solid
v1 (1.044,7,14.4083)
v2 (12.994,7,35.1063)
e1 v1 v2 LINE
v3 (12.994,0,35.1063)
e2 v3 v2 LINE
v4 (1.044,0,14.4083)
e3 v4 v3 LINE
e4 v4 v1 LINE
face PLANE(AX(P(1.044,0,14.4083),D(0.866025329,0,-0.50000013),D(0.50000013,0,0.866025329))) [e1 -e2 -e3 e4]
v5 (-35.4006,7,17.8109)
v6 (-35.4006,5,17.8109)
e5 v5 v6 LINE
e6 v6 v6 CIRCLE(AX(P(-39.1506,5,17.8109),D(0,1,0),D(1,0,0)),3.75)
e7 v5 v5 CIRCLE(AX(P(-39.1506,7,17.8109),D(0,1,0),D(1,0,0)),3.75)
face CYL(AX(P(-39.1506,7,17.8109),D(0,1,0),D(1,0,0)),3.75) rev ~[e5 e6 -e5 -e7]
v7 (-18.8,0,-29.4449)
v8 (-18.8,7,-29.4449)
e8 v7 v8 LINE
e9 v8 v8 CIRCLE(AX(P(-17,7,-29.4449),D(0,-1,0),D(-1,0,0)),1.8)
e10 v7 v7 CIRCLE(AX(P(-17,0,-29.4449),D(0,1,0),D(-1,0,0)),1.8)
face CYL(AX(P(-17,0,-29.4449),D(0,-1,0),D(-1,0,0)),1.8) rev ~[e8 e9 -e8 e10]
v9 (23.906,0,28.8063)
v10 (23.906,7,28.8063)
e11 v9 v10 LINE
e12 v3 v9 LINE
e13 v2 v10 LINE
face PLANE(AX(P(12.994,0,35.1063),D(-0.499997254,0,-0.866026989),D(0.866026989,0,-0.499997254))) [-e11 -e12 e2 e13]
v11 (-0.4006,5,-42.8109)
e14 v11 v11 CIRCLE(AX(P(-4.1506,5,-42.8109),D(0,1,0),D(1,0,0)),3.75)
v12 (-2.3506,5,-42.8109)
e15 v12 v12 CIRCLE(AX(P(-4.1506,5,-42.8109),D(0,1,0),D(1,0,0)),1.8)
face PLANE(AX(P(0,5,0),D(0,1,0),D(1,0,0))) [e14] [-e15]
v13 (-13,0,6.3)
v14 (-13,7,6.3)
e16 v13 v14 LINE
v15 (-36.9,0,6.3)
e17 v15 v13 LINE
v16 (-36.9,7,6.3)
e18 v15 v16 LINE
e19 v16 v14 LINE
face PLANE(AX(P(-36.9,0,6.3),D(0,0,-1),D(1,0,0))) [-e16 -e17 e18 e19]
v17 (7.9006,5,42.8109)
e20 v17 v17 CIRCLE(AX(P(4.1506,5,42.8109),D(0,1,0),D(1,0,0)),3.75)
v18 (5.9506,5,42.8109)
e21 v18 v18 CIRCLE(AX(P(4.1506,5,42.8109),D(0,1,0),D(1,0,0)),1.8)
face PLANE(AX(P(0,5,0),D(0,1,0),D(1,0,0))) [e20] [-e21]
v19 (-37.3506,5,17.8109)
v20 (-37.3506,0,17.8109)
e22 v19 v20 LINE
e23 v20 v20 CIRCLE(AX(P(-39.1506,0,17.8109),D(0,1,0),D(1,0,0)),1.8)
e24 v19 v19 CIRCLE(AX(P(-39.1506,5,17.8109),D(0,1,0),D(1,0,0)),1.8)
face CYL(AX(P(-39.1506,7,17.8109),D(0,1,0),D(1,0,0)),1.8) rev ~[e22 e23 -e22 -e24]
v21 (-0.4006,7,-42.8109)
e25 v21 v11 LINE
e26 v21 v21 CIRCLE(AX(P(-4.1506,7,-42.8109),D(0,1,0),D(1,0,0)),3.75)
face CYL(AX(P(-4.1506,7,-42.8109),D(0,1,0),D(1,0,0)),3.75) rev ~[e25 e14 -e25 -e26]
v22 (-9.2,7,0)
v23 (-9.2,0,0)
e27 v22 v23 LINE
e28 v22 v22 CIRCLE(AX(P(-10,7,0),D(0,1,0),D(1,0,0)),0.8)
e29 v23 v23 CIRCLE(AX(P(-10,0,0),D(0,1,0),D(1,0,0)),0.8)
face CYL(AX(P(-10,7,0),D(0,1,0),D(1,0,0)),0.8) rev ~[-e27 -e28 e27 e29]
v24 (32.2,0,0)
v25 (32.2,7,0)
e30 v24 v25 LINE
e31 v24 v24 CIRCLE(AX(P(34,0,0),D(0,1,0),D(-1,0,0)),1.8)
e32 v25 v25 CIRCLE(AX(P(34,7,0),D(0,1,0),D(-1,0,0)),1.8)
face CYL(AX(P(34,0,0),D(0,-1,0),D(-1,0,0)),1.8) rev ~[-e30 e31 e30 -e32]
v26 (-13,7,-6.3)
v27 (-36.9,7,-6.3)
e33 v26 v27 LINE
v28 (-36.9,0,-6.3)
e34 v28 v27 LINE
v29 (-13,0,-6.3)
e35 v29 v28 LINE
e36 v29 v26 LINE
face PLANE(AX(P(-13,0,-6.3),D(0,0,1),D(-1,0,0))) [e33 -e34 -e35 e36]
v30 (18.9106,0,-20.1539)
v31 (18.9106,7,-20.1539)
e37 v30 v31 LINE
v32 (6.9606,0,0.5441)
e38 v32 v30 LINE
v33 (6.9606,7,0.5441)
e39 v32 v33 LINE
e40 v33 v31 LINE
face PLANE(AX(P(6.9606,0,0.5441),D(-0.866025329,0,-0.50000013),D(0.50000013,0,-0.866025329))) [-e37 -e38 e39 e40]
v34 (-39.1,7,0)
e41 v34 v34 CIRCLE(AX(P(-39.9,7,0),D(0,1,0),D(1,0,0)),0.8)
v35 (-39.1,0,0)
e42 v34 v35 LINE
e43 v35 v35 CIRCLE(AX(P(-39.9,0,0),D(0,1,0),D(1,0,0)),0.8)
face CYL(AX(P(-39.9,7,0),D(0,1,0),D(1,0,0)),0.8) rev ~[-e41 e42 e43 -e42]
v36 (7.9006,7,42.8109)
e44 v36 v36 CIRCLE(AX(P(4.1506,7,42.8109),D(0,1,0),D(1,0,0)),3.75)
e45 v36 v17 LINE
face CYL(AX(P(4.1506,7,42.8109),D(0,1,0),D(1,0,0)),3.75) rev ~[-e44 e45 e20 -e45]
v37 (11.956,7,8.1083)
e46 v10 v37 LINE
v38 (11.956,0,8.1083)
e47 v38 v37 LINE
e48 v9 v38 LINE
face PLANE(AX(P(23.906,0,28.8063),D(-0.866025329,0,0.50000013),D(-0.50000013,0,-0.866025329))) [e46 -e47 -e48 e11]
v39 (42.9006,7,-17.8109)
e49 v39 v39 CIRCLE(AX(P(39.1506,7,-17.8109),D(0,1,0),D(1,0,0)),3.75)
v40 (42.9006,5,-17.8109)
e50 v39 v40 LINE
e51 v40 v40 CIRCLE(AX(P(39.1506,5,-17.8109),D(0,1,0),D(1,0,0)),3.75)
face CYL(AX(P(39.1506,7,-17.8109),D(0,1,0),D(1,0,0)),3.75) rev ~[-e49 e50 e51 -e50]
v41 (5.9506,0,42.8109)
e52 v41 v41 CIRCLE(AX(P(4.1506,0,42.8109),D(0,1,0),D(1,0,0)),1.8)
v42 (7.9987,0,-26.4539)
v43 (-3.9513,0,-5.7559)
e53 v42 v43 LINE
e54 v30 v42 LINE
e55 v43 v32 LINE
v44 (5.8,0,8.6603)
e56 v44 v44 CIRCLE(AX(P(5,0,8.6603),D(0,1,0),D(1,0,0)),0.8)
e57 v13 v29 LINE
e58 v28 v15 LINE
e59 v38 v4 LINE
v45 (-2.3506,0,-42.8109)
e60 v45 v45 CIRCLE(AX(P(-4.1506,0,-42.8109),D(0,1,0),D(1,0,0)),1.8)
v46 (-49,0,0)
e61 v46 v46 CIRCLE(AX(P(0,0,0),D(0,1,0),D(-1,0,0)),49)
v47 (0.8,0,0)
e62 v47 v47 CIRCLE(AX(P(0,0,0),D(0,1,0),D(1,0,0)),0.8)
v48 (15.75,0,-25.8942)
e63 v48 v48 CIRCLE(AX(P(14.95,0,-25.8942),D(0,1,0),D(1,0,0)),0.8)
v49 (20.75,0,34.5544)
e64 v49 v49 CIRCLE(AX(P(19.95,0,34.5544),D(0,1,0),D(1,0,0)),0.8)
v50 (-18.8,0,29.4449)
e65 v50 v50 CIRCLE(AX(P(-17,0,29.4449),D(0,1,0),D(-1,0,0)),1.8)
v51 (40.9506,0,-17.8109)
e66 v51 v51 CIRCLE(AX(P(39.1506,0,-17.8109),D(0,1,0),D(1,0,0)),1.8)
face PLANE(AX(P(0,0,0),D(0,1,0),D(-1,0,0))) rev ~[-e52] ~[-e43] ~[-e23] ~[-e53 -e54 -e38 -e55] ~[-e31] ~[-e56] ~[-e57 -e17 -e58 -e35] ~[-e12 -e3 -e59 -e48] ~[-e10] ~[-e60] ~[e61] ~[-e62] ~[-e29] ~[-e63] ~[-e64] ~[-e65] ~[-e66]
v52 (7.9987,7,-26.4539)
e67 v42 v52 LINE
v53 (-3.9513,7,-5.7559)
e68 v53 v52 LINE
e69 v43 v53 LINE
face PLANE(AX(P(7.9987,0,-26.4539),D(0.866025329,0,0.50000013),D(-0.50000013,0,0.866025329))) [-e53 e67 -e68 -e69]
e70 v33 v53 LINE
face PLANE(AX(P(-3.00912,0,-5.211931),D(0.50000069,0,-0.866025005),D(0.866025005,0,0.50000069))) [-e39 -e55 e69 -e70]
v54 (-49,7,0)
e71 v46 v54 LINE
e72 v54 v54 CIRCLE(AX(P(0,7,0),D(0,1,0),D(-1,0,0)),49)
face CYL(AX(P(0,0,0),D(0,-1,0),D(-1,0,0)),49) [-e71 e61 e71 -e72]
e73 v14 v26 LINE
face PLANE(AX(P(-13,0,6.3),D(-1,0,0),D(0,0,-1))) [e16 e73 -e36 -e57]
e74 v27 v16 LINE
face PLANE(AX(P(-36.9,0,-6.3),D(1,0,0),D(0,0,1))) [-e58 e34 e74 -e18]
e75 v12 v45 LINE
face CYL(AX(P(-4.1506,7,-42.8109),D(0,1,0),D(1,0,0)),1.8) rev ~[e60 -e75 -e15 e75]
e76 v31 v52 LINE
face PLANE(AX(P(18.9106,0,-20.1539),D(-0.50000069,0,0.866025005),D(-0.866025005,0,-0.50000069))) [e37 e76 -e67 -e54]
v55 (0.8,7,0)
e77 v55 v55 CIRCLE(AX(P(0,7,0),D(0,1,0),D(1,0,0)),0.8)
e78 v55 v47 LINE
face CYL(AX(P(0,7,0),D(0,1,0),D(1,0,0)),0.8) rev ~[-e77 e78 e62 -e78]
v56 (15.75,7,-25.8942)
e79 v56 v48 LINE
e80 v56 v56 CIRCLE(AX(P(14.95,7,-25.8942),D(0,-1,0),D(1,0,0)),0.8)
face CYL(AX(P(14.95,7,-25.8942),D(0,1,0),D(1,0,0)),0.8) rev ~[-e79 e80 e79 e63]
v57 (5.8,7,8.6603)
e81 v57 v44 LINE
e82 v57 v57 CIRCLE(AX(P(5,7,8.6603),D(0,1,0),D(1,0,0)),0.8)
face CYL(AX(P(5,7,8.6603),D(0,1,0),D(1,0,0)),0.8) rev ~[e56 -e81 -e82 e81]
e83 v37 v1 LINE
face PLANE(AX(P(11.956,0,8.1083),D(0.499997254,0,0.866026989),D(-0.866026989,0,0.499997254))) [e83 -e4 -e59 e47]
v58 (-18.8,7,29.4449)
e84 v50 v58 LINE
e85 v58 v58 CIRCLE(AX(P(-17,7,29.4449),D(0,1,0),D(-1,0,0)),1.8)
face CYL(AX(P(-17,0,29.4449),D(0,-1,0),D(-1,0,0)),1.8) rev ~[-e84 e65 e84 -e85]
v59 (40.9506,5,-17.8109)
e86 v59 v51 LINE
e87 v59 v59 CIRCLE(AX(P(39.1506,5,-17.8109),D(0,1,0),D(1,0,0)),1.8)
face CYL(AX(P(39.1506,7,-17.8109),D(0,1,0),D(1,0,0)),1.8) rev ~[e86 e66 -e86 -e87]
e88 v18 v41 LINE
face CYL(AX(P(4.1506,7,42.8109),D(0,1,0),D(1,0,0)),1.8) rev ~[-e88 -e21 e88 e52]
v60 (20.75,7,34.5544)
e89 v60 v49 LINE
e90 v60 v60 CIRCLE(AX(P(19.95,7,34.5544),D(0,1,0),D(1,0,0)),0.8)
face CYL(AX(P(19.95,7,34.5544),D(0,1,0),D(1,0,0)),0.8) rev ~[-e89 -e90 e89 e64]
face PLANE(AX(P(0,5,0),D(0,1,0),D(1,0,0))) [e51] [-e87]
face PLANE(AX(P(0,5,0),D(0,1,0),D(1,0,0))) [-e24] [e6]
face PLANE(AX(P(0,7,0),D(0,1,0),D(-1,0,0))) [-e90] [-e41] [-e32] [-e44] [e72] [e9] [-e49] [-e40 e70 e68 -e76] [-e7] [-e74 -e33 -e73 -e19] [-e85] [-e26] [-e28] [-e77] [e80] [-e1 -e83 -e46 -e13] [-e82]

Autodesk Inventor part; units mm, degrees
ref_plane "YZ Plane" through (0, 0, 0) normal (1, 0, 0) x (0, 1, 0)
ref_plane "XZ Plane" through (0, 0, 0) normal (0, 1, 0) x (-1, 0, 0)
ref_plane "XY Plane" through (0, 0, 0) normal (0, 0, 1) x (1, 0, 0)
sketch "Sketch1" plane through (0, 0, 0) normal (0, 1, 0) x (-1, 0, 0)
  circle A0 centre (0, 0) radius 45 construction
  line L0 (36.9, 6.3) -> (13, 6.3)
  line L1 (13, 6.3) -> (13, -6.3)
  line L2 (13, -6.3) -> (36.9, -6.3)
  line L3 (36.9, -6.3) -> (36.9, 6.3)
  line L4 (-12.994, 35.1063) -> (-23.906, 28.8063)
  line L5 (-23.906, 28.8063) -> (-11.956, 8.1083)
  line L6 (-1.044, 14.4083) -> (-12.994, 35.1063)
  line L7 (-11.956, 8.1083) -> (-1.044, 14.4083)
  line L8 (-18.9106, -20.1539) -> (-7.9987, -26.4539)
  line L9 (-7.9987, -26.4539) -> (3.9513, -5.7559)
  line L10 (-6.9606, 0.5441) -> (-18.9106, -20.1539)
  line L11 (3.9513, -5.7559) -> (-6.9606, 0.5441)
  circle A1 centre (11.0177, 0) radius 18 construction
  circle A2 centre (-5.5088, 9.5416) radius 18 construction
  circle A3 centre (-5.5088, -9.5416) radius 18 construction
  circle A4 centre (17, -29.4449) radius 1.8
  line L12 (0, 0) -> (20.2687, -35.1063)
  circle A5 centre (17, 29.4449) radius 1.8
  circle A6 centre (-34, 0) radius 1.8
  circle A7 centre (0, 0) radius 49
  line L13 (-5.5088, -9.5416) -> (-0.5088, -0.8813) construction
  line L14 (-5.5088, -9.5416) -> (4.4912, -9.5416) construction
  line L15 (-18.45, -31.9563) -> (3.4912, 6.0469) construction
  line L16 (-17.931, -18.4573) -> (-7.019, -24.7573) construction
  point P0 (-12.475, -21.6073)
  point P1 (-7.4794, -12.9547)
  dimension "d0" = 90
  dimension "d1" = 12.6
  dimension "d2" = 23.9
  dimension "d3" = 13
  dimension "d4" = 38.7
  dimension "d7" = 360
  dimension "d9" = 36
  dimension "d12" = 360
  dimension "d14" = 3.6
  dimension "d15" = 34
  dimension "d16" = -0.544
  dimension "d19" = 360
  dimension "d21" = 98
  dimension "d38" = 10
  dimension "d39" = 60
  dimension "d40" = 14.9588
extrude "Extrusion1" add sketch "Sketch1" along normal blind 7
sketch "Sketch2" plane through (0, 7, 0) normal (0, 1, 0) x (1, 0, 0)
  circle A0 centre (0, 0) radius 39.9 construction
  line L0 (1.044, -14.4083) -> (11.956, -8.1083) construction
  line L1 (6.5, -11.2583) -> (23.7787, -41.1859) construction
  circle A1 centre (19.95, -34.5544) radius 0.8
  circle A2 centre (14.95, 25.8942) radius 0.8
  circle A3 centre (-39.9, 0) radius 0.8
  line L2 (12.994, -35.1063) -> (1.044, -14.4083) construction
  line L3 (7.019, -24.7573) -> (17.931, -18.4573) construction
  line L4 (11.956, -8.1083) -> (23.906, -28.8063) construction
  circle A4 centre (5, -8.6603) radius 0.8
  circle A5 centre (0, 0) radius 0.8
  circle A6 centre (-10, 0) radius 0.8
  line L5 (0, 0) -> (22.1905, 38.4351) construction
  line L6 (0, 0) -> (44.3811, 0) construction
  line L7 (15.8257, 27.411) -> (10.8257, 18.7507)
  dimension "d24" = 79.8
  dimension "d25" = 1.6
  dimension "d28" = 360
  dimension "d34" = 360
  dimension "d41" = 60
  dimension "d42" = 10
extrude "Extrusion2" cut sketch "Sketch2" against normal through all
sketch "Sketch6" plane through (0, 7, 0) normal (0, 1, 0) x (1, 0, 0)
  line L0 (39.1506, 17.8109) -> (-4.1506, 42.8109)
  line L1 (-4.1506, 42.8109) -> (-39.1506, -17.8109)
  line L2 (-39.1506, -17.8109) -> (4.1506, -42.8109)
  line L3 (4.1506, -42.8109) -> (39.1506, 17.8109)
  line L4 (21.6506, -12.5) -> (-21.6506, 12.5) construction
  circle A0 centre (0, 0) radius 0.8 construction
  line L5 (0, 0) -> (-28.8675, 0) construction
  circle A1 centre (-39.1506, -17.8109) radius 1.8
  circle A2 centre (4.1506, -42.8109) radius 1.8
  circle A3 centre (-4.1506, 42.8109) radius 1.8
  circle A4 centre (39.1506, 17.8109) radius 1.8
  point P0 (0, 0)
  dimension "d43" = 25
  dimension "d44" = 25
  dimension "d45" = 35
  dimension "d46" = 35
  dimension "d47" = 30
  dimension "d48" = 3.6
  dimension "d49" = 3.6
extrude "Extrusion3" cut sketch "Sketch6" against normal through all contours L3 A4 L0 | L0 A4 L3 | A3 L1 L0 | L0 L1 A3 | A2 L2 L3 | L3 L2 A2 | A1 L2 L1 | L1 L2 A1
sketch "Sketch7" plane through (0, 7, 0) normal (0, 1, 0) x (1, 0, 0)
  circle A0 centre (-4.1506, 42.8109) radius 1.8 projected
  circle A1 centre (-4.1506, 42.8109) radius 3.75
  circle A2 centre (39.1506, 17.8109) radius 1.8 projected
  circle A3 centre (39.1506, 17.8109) radius 3.75
  circle A4 centre (-39.1506, -17.8109) radius 1.8 projected
  circle A5 centre (-39.1506, -17.8109) radius 3.75
  circle A6 centre (4.1506, -42.8109) radius 1.8 projected
  circle A7 centre (4.1506, -42.8109) radius 3.75
  point P0 (0, 0)
  dimension "d52" = 7.5
  dimension "d53" = 7.5
  dimension "d54" = 7.5
  dimension "d55" = 7.5
extrude "Extrusion4" cut sketch "Sketch7" against normal blind 2 contours A0 | A1 | A2 | A3 | A5 | A6 | A7
properties part number "Servo Mounts"
